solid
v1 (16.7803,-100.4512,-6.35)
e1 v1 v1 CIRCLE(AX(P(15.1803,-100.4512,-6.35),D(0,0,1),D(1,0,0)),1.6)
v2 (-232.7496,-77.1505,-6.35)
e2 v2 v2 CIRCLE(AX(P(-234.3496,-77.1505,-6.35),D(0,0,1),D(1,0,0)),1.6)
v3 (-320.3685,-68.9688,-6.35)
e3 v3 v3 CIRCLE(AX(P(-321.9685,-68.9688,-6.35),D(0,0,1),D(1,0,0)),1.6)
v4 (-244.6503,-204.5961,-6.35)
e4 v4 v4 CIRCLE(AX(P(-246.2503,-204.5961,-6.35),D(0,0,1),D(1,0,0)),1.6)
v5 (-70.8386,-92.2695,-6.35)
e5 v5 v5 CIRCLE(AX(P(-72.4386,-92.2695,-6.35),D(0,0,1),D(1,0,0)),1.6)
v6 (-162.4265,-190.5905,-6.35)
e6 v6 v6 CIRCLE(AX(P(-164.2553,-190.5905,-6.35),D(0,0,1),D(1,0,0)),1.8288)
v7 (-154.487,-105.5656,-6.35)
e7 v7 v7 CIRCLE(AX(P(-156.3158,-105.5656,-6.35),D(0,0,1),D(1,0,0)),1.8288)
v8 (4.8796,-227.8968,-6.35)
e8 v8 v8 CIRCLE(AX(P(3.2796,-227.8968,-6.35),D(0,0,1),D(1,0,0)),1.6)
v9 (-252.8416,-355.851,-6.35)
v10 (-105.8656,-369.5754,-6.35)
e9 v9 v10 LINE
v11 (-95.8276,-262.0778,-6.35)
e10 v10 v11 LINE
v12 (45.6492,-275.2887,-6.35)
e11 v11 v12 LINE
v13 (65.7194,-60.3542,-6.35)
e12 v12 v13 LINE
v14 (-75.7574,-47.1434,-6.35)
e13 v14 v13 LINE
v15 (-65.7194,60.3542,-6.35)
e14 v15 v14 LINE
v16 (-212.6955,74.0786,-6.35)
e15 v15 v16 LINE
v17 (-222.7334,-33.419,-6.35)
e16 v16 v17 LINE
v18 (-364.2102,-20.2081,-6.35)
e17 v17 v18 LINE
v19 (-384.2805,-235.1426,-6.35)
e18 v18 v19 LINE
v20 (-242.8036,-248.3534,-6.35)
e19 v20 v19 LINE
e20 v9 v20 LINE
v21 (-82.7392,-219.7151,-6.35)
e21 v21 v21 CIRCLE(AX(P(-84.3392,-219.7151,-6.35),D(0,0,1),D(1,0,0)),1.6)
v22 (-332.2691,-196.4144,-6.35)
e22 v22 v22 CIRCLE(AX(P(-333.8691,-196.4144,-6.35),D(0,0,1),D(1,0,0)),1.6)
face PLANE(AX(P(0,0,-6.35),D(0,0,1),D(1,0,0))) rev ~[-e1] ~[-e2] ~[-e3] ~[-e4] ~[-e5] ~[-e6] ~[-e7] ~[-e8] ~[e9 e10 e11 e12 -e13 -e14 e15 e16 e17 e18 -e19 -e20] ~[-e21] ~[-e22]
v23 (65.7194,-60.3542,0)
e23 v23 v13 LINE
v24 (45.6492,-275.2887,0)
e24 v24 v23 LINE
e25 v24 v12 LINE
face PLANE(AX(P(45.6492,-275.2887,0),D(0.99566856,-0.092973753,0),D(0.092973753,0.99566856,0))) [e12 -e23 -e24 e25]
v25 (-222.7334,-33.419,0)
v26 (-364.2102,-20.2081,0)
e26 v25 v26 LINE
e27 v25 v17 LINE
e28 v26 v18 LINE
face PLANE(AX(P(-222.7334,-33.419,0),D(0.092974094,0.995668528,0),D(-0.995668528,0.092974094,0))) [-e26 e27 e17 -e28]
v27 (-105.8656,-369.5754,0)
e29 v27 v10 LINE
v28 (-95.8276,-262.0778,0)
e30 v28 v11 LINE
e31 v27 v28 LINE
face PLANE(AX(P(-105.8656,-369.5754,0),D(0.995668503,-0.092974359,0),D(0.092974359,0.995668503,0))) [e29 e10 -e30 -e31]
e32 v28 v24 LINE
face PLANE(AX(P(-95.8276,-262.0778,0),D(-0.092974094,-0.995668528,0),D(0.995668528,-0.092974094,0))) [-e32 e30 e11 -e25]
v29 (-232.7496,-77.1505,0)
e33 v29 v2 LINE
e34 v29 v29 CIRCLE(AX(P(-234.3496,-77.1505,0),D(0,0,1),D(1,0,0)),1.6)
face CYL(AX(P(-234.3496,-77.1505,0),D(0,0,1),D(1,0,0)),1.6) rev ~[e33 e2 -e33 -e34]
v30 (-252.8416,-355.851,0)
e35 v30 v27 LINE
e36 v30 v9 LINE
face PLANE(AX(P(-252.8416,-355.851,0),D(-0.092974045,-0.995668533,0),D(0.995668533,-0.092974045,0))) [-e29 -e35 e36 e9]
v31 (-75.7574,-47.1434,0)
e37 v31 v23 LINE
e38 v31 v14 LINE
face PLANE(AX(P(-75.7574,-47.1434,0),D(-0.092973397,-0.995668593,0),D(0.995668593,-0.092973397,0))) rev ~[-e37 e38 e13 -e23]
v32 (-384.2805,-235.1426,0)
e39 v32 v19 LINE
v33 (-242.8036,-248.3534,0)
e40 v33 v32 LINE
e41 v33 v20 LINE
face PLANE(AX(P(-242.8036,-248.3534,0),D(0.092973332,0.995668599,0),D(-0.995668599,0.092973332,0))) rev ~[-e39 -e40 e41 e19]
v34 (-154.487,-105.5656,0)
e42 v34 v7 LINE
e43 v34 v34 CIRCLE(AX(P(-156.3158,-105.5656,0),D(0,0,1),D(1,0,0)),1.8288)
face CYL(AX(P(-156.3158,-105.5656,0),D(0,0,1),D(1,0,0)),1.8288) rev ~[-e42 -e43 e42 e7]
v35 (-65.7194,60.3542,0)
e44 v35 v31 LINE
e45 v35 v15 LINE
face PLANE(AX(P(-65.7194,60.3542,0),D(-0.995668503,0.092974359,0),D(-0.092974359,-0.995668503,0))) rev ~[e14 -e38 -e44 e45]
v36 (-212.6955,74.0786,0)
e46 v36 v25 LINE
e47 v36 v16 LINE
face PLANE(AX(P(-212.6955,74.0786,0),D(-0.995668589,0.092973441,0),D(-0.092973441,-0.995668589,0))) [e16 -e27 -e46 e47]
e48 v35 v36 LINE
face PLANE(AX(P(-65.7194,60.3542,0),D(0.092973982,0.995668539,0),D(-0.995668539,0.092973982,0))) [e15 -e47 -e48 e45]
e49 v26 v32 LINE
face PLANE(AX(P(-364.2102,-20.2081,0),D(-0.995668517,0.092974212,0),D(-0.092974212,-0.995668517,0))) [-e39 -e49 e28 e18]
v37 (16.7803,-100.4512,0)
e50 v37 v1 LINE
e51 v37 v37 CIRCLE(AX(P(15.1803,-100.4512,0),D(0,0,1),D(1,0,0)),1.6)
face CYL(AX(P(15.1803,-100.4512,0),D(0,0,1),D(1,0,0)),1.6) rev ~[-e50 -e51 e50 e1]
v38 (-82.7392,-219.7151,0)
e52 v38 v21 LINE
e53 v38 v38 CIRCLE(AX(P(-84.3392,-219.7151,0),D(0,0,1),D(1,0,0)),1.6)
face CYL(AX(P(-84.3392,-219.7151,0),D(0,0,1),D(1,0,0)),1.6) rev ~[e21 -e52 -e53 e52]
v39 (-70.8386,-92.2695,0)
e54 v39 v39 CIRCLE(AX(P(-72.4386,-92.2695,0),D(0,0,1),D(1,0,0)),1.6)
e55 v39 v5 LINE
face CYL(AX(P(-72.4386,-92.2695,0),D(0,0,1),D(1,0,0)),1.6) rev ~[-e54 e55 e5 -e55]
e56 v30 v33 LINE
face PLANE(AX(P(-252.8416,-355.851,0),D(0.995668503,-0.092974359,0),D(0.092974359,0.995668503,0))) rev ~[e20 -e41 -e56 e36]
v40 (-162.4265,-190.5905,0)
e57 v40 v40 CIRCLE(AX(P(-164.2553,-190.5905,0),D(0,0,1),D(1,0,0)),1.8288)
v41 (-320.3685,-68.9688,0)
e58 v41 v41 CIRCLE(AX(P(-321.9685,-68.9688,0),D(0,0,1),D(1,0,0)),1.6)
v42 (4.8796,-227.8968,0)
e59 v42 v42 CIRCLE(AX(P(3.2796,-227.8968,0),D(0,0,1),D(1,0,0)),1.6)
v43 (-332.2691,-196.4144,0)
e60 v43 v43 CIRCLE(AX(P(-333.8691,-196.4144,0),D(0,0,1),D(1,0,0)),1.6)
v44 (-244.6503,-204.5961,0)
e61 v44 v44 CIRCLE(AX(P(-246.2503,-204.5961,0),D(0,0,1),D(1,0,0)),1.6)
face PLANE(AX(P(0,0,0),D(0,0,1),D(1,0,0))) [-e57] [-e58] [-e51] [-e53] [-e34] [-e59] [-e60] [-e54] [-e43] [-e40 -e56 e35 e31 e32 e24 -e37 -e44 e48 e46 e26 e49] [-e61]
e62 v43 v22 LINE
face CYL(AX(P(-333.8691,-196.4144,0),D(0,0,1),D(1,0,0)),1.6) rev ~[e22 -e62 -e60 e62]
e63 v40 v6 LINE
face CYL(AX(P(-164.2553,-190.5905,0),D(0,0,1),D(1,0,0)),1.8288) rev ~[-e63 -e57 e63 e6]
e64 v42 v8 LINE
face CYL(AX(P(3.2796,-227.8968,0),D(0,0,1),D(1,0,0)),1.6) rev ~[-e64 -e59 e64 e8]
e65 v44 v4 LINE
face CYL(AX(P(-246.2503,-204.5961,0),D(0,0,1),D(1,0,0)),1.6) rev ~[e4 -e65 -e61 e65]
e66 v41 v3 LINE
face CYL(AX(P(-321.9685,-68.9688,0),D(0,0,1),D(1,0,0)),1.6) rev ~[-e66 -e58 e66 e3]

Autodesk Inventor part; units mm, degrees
ref_plane "YZ Plane" through (0, 0, 0) normal (1, 0, 0) x (0, 1, 0)
ref_plane "XZ Plane" through (0, 0, 0) normal (0, 1, 0) x (-1, 0, 0)
sketch "Sketch1" plane through (0, 0, 0) normal (0, 0, 1) x (1, 0, 0)
  line L0 (-65.7194, 60.3542) -> (-75.7574, -47.1434) projected
  line L1 (-75.7574, -47.1434) -> (65.7194, -60.3542) projected
  line L2 (-95.8276, -262.0778) -> (45.6492, -275.2887) projected
  line L3 (-105.8656, -369.5754) -> (-95.8276, -262.0778) projected
  line L4 (-212.6955, 74.0786) -> (-222.7334, -33.419) projected
  line L5 (-222.7334, -33.419) -> (-364.2102, -20.2081) projected
  line L6 (-242.8036, -248.3534) -> (-384.2805, -235.1426) projected
  line L7 (-252.8416, -355.851) -> (-242.8036, -248.3534) projected
  circle A0 centre (-72.4386, -92.2695) radius 2.6 construction
  circle A1 centre (-84.3392, -219.7151) radius 2.6 construction
  circle A2 centre (3.2796, -227.8968) radius 2.6 construction
  circle A3 centre (15.1803, -100.4512) radius 2.6 construction
  circle A4 centre (-156.3158, -105.5656) radius 1.7526 construction
  circle A5 centre (-164.2553, -190.5905) radius 1.7526 construction
  circle A6 centre (-246.2503, -204.5961) radius 2.6 construction
  circle A7 centre (-333.8691, -196.4144) radius 2.6 construction
  circle A8 centre (-321.9685, -68.9688) radius 2.6 construction
  circle A9 centre (-234.3496, -77.1505) radius 2.6 construction
  circle A10 centre (15.1803, -100.4512) radius 1.6
  circle A11 centre (3.2796, -227.8968) radius 1.6
  circle A12 centre (-84.3392, -219.7151) radius 1.6
  circle A13 centre (-72.4386, -92.2695) radius 1.6
  circle A14 centre (-234.3496, -77.1505) radius 1.6
  circle A15 centre (-321.9685, -68.9688) radius 1.6
  circle A16 centre (-333.8691, -196.4144) radius 1.6
  circle A17 centre (-246.2503, -204.5961) radius 1.6
  line L8 (-65.7194, 60.3542) -> (-212.6955, 74.0786)
  line L9 (-364.2102, -20.2081) -> (-384.2805, -235.1426)
  line L10 (-252.8416, -355.851) -> (-105.8656, -369.5754)
  line L11 (45.6492, -275.2887) -> (65.7194, -60.3542)
  circle A18 centre (-156.3158, -105.5656) radius 1.8288
  circle A19 centre (-164.2553, -190.5905) radius 1.8288
  point P0 (0, 0)
  dimension "d0" = 3.2
  dimension "d1" = 3.2
  dimension "d2" = 3.2
  dimension "d3" = 3.2
  dimension "d4" = 3.2
  dimension "d5" = 3.2
  dimension "d6" = 3.2
  dimension "d7" = 3.2
  dimension "d8" = 3.6576
  dimension "d9" = 3.6576
ref_plane "Work Plane1" through (-97.3094, -87.3563, -6.35) normal (0, 0, -1) x (0, 1, 0)
extrude "Extrusion1" add sketch "Sketch1" against normal up to surface (6.35 mm away)
properties part number "Pod_Holders" material "Aluminum"
